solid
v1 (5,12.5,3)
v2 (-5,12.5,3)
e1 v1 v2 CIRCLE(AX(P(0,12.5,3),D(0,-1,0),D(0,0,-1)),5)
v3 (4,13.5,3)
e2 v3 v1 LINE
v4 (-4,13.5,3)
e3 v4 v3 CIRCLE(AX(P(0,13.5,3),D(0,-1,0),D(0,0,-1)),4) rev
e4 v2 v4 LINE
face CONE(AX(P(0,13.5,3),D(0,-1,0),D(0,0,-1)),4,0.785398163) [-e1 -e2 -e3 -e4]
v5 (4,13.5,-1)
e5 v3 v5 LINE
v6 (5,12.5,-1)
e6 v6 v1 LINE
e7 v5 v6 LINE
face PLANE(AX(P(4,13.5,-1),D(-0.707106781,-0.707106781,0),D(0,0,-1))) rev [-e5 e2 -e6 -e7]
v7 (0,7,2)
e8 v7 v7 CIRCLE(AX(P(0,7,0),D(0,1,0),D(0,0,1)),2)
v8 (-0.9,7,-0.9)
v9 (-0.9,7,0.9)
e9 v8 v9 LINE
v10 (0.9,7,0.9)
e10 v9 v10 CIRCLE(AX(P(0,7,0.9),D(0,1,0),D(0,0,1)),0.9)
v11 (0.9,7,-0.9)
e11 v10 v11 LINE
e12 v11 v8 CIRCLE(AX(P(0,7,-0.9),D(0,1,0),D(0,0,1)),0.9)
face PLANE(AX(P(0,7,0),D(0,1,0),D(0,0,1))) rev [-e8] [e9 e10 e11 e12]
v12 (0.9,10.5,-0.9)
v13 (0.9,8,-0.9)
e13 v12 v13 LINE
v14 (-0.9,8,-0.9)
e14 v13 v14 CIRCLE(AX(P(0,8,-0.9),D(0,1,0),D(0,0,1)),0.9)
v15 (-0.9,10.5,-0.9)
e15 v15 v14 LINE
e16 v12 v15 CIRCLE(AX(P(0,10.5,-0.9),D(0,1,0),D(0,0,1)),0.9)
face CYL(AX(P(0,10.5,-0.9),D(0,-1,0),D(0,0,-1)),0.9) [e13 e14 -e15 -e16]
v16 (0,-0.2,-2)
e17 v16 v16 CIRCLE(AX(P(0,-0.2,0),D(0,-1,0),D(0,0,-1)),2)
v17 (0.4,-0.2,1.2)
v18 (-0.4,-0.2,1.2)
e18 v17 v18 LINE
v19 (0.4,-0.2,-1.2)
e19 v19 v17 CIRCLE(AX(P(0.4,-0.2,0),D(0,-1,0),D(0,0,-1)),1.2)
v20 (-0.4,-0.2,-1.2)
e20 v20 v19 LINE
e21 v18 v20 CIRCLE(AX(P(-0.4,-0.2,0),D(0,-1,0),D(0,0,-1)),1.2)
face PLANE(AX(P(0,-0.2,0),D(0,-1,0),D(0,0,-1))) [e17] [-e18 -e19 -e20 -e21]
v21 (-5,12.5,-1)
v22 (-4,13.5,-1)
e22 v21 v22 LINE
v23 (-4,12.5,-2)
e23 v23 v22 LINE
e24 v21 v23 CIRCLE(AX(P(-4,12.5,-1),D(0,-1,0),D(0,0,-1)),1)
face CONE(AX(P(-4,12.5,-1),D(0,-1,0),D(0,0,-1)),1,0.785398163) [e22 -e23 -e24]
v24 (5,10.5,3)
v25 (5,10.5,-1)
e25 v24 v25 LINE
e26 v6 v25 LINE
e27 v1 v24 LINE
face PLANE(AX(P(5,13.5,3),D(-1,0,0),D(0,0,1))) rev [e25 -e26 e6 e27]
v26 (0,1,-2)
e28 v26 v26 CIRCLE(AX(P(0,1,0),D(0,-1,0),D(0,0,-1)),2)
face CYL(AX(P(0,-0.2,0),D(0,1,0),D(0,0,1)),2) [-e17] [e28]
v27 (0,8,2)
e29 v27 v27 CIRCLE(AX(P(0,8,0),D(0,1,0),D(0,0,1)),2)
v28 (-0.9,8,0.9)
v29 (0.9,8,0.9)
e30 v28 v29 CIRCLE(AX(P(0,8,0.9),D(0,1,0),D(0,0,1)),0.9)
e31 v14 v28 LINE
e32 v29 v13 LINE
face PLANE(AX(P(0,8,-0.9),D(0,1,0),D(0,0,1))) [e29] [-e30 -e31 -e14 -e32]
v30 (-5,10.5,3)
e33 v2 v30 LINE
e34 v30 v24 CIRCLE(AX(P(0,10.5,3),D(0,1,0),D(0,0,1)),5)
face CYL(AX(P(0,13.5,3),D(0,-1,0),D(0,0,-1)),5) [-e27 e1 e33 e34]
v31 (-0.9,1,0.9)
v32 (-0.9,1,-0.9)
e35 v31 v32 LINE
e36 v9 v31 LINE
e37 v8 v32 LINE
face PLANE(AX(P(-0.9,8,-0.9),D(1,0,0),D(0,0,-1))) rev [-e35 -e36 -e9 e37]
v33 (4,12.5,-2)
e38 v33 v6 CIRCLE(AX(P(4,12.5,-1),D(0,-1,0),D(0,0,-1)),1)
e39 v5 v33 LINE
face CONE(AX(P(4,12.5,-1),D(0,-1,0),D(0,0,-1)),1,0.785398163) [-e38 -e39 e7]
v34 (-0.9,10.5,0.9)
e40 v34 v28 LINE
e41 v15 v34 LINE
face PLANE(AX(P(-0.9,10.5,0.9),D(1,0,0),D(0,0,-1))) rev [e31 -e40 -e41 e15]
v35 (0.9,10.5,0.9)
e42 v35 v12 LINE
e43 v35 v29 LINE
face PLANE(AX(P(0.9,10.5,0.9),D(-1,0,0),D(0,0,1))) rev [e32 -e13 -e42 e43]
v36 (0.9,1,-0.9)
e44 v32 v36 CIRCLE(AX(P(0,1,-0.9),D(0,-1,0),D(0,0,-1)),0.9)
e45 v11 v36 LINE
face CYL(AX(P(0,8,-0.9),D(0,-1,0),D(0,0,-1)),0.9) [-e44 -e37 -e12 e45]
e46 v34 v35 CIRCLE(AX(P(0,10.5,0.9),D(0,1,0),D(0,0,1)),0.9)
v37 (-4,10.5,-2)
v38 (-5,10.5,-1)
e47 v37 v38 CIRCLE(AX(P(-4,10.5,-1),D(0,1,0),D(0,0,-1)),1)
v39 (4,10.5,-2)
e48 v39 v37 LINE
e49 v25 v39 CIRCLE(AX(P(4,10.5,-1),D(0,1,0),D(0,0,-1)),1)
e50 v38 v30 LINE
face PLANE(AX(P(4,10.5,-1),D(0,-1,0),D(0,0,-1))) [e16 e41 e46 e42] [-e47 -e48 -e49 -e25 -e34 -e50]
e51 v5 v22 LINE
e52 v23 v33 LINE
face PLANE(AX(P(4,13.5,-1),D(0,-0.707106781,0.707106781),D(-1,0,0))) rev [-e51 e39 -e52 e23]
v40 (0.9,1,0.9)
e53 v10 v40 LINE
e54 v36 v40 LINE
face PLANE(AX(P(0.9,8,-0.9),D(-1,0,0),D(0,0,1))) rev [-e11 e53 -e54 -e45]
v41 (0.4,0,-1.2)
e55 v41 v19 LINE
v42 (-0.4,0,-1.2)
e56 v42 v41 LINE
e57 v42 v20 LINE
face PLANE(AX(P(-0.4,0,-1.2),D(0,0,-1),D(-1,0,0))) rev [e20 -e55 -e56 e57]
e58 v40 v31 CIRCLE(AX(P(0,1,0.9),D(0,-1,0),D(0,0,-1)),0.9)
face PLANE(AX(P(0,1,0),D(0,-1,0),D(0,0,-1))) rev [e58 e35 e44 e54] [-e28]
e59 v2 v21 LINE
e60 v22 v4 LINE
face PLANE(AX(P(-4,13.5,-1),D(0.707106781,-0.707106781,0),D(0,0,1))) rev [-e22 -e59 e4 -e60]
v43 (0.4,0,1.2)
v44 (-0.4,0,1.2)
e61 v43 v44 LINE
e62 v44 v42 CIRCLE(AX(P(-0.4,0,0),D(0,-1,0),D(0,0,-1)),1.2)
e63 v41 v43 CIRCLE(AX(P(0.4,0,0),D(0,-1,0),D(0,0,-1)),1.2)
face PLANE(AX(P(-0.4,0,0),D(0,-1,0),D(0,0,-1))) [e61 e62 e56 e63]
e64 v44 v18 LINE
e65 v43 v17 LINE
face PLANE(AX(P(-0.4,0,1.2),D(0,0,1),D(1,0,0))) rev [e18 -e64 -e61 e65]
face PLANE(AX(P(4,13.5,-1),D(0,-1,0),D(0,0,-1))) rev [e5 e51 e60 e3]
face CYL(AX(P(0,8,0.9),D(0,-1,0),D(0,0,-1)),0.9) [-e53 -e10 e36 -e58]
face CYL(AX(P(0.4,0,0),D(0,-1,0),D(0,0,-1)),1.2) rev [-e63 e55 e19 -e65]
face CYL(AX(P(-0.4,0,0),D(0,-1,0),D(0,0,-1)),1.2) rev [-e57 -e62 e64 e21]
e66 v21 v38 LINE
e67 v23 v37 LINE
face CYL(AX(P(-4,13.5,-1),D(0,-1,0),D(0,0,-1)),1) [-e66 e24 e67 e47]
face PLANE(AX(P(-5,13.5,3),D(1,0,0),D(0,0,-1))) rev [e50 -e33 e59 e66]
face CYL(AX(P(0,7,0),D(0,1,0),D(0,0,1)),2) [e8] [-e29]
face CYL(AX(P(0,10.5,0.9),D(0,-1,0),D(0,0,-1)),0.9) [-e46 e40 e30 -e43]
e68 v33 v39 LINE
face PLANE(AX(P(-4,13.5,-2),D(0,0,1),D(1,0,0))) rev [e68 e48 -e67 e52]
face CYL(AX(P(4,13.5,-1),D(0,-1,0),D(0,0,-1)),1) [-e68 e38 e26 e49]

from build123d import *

# Parameters (mm, degrees)
EXTRUDE_1_DEPTH      = 8
SKETCH_2_R           = 2
EXTRUDE_2_DEPTH      = 1
EXTRUDE_3_DEPTH      = 0.2
EXTRUDE_3_DEPTH_BACK = 1
SKETCH_3_R           = 2
EXTRUDE_4_DEPTH      = 2.5
EXTRUDE_5_DEPTH      = 3
CHAMFER_1_SIZE       = 1
CUT_EXTRUDE_1_DEPTH  = 0.2


with BuildPart() as part:
    # 草图1 → 凸台-拉伸1 (new body)
    with BuildSketch(Plane(origin=(0, 0, 0), x_dir=(1, 0, 0), z_dir=(0, 1, 0))):
        with BuildLine():
            Line((0.9, 0.9), (0.9, -0.9))
            ThreePointArc((0.9, -0.9), (0, -1.8), (-0.9, -0.9))
            Line((-0.9, -0.9), (-0.9, 0.9))
            ThreePointArc((-0.9, 0.9), (0, 1.8), (0.9, 0.9))
        make_face()
    extrude(amount=EXTRUDE_1_DEPTH)

    # 草图2 → 凸台-拉伸2 (add)
    with BuildSketch(Plane(origin=(0, 8, 0), x_dir=(1, 0, 0), z_dir=(0, 1, 0))):
        with Locations(Location((0, 0, 0), (0, 0, 270))):
            Circle(SKETCH_2_R)
    extrude(amount=-EXTRUDE_2_DEPTH)

    # 草图3 → 凸台-拉伸3 (add, two sides: drawn at the far end of the back side and taken through both)
    with BuildSketch(Plane.XZ.offset(-EXTRUDE_3_DEPTH_BACK)):
        with Locations(Location((0, 0, 0), (0, 0, 90))):
            Circle(SKETCH_3_R)
    extrude(amount=EXTRUDE_3_DEPTH + EXTRUDE_3_DEPTH_BACK)

    # 草图6 → 凸台-拉伸4 (add)
    with BuildSketch(Plane(origin=(0, 8, 0), x_dir=(1, 0, 0), z_dir=(0, 1, 0))):
        with BuildLine():
            Line((-0.9, -0.9), (-0.9, 0.9))
            ThreePointArc((-0.9, 0.9), (0, 1.8), (0.9, 0.9))
            Line((0.9, 0.9), (0.9, -0.9))
            ThreePointArc((0.9, -0.9), (0, -1.8), (-0.9, -0.9))
        make_face()
    extrude(amount=EXTRUDE_4_DEPTH)

    # 草图7 → 凸台-拉伸5 (add)
    with BuildSketch(Plane(origin=(0, 10.5, 0), x_dir=(1, 0, 0), z_dir=(0, 1, 0))):
        with BuildLine():
            Line((-5, -3), (-5, 1))
            ThreePointArc((-5, 1), (-4.707106781, 1.707106781), (-4, 2))
            Line((-4, 2), (4, 2))
            ThreePointArc((4, 2), (4.707106781, 1.707106781), (5, 1))
            Line((5, 1), (5, -3))
            ThreePointArc((5, -3), (0, -8), (-5, -3))
        make_face()
    extrude(amount=EXTRUDE_5_DEPTH)

    # 倒角1
    chamfer_1_edges = [part.edges().sort_by_distance(p)[0] for p in [
        (4.707106781, 13.5, -1.707106781),
        (0, 13.5, -2),
        (-4.707106781, 13.5, -1.707106781),
        (-5, 13.5, 1),
        (0, 13.5, 8),
        (5, 13.5, 1),
    ]]
    chamfer(chamfer_1_edges, length=CHAMFER_1_SIZE - 0.0001)  # a hair under: the kernel refuses the full size

    # 草图8 → 切除-拉伸1 (cut)
    with BuildSketch(Plane.XZ.offset(0.2)):
        with BuildLine():
            Line((-0.4, 1.2), (0.4, 1.2))
            ThreePointArc((0.4, 1.2), (1.6, 0), (0.4, -1.2))
            Line((0.4, -1.2), (-0.4, -1.2))
            ThreePointArc((-0.4, -1.2), (-1.6, 0), (-0.4, 1.2))
        make_face()
    extrude(amount=-CUT_EXTRUDE_1_DEPTH, mode=Mode.SUBTRACT)


solid = part.part
